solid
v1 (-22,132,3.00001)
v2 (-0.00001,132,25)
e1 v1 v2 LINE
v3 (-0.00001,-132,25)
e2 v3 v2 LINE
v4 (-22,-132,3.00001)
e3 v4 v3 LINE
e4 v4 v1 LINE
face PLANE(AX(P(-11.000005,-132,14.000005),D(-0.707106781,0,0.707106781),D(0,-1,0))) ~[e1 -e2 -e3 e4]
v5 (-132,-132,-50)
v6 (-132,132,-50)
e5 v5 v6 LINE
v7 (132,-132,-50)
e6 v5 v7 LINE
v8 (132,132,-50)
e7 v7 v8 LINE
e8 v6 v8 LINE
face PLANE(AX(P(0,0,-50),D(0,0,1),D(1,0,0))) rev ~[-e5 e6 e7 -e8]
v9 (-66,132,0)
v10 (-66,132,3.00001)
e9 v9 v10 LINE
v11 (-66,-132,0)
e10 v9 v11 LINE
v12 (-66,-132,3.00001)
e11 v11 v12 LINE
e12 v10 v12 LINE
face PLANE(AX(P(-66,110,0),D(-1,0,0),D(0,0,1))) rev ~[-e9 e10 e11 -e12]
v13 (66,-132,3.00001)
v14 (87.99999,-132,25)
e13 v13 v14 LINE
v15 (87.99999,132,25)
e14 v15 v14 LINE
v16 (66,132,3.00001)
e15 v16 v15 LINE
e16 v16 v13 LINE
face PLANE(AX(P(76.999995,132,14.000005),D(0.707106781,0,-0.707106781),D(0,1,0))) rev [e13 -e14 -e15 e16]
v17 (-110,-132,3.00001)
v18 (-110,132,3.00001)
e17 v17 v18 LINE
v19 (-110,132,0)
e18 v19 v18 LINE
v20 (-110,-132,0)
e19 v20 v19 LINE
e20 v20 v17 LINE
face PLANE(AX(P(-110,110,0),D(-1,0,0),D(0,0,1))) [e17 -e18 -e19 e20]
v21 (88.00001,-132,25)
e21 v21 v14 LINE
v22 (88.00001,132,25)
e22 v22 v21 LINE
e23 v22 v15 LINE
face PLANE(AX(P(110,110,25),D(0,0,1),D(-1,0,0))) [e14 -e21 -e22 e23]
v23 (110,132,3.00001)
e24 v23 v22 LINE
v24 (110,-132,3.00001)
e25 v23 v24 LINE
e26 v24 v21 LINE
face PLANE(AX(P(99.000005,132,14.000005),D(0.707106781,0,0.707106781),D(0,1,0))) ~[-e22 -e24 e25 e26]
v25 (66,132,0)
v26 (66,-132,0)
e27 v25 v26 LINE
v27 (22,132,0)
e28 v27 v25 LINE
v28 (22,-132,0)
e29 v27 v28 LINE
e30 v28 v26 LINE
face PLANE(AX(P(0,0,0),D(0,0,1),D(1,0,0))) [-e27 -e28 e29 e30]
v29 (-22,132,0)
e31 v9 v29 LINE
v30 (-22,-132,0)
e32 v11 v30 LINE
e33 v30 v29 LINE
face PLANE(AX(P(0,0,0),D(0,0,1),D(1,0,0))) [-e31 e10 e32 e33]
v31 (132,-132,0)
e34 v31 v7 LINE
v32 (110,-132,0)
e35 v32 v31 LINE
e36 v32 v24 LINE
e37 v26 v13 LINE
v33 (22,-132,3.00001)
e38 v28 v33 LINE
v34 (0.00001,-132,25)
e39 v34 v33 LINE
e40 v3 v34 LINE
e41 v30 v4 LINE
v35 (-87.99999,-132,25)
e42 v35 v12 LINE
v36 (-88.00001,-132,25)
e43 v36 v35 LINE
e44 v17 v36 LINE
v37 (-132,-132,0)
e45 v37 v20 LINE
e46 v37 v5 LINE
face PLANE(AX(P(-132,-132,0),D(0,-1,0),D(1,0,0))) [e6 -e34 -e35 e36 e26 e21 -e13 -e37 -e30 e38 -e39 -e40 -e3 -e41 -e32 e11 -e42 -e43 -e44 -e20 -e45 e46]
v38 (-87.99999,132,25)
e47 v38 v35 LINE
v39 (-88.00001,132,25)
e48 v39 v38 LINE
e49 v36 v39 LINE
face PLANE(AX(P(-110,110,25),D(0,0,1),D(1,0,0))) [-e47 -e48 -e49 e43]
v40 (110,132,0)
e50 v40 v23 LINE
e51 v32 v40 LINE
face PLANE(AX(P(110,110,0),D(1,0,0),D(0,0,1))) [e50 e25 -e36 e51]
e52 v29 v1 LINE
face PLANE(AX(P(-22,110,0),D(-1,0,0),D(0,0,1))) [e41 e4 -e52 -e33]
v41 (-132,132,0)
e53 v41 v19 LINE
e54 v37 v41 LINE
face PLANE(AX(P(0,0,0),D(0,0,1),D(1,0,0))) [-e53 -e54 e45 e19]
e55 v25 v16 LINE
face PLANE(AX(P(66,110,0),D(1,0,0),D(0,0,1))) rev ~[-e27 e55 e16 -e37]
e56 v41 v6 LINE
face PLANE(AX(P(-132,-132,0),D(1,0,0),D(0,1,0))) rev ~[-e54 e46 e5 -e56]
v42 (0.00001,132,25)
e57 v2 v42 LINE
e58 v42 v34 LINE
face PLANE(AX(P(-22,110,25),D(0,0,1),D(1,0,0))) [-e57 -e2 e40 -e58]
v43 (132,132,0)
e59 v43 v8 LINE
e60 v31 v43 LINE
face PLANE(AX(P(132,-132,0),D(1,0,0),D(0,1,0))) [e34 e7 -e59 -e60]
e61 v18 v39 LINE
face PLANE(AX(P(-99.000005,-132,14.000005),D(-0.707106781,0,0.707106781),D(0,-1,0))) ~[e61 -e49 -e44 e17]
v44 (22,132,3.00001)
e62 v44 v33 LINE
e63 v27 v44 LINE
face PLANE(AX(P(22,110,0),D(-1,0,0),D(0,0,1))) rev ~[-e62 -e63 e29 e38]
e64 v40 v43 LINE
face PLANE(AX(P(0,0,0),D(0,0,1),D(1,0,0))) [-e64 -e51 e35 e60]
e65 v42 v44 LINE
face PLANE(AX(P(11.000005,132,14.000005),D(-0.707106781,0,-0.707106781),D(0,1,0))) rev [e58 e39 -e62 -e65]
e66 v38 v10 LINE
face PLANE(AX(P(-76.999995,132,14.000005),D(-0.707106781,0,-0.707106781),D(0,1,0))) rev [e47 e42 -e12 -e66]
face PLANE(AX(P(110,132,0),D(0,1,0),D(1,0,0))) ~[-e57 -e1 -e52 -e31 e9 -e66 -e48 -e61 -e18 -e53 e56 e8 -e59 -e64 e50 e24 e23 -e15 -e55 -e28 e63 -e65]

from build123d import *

# Parameters (mm, degrees)
F0_W     = 44
F0_H     = 44
F1_DEPTH = 25
F0_W_2   = 264
F0_H_2   = 264
F4_DEPTH = 50
F5_DEPTH = 44
F6_DEPTH = 22
F7_SIZE  = 21.99999


# Not quite as in the source:
# - a fillet or chamfer is up to 0.001 mm smaller than in the source, because OpenCascade refuses the exact size


with BuildPart() as f1:
    # F0 (on Top) → F1 (new body)
    with BuildSketch(Plane.XY):
        with Locations((-88, 88)):
            Rectangle(F0_W, F0_H)
    extrude(amount=F1_DEPTH)


with BuildPart() as f1b:
    # F0 (on Top) → F1, piece 2 (new body)
    with BuildSketch(Plane.XY):
        with Locations((0, 88)):
            Rectangle(F0_W, F0_H)
    extrude(amount=F1_DEPTH)


with BuildPart() as f1c:
    # F0 (on Top) → F1, piece 3 (new body)
    with BuildSketch(Plane.XY):
        Rectangle(F0_W, F0_H)
    extrude(amount=F1_DEPTH)


with BuildPart() as f1d:
    # F0 (on Top) → F1, piece 4 (new body)
    with BuildSketch(Plane.XY):
        with Locations((-88, 0)):
            Rectangle(F0_W, F0_H)
    extrude(amount=F1_DEPTH)


with BuildPart() as f2_1:
    # F2: instance of F1d
    add(f1d.part.mirror(Plane.YZ))


with BuildPart() as f2_2:
    # F2: instance of F1
    add(f1.part.mirror(Plane.YZ))


with BuildPart() as f3_1:
    # F3: instance of F1
    add(f1.part.mirror(Plane.XZ))


with BuildPart() as f3_2:
    # F3: instance of F1b
    add(f1b.part.mirror(Plane.XZ))


with BuildPart() as f3_3:
    # F3: instance of F2_2
    add(f2_2.part.mirror(Plane.XZ))


with BuildPart() as f1_1:
    add(f1.part)

    add(f1b.part)  # F4 merges F1b

    add(f1c.part)  # F4 merges F1c

    add(f1d.part)  # F4 merges F1d

    add(f2_1.part)  # F4 merges F2_1

    add(f2_2.part)  # F4 merges F2_2

    add(f3_1.part)  # F4 merges F3_1

    add(f3_2.part)  # F4 merges F3_2

    add(f3_3.part)  # F4 merges F3_3
    # F0 (on Top) → F4 (join)
    with BuildSketch(Plane.XY):
        Rectangle(F0_W_2, F0_H_2)
        with Locations((-88, 0)):
            Rectangle(F0_W, F0_H, mode=Mode.SUBTRACT)
        with Locations((-88, 88)):
            Rectangle(F0_W, F0_H, mode=Mode.SUBTRACT)
        Rectangle(F0_W, F0_H, mode=Mode.SUBTRACT)
        with Locations((0, 88)):
            Rectangle(F0_W, F0_H, mode=Mode.SUBTRACT)
        with Locations((-88, 0)):
            Rectangle(F0_W, F0_H)
        Rectangle(F0_W, F0_H)
        with Locations((-88, 88)):
            Rectangle(F0_W, F0_H)
        with Locations((0, 88)):
            Rectangle(F0_W, F0_H)
    extrude(amount=-F4_DEPTH)

    # F5 (add): faces of the model
    f5_faces = [f1_1.faces().sort_by_distance(p)[0] for p in [
        (-88, -66, 12.5),
        (-88, 22, 12.5),
        (0, 22, 12.5),
        (0, -66, 12.5),
        (88, -66, 12.5),
        (88, 22, 12.5),
    ]]
    extrude(f5_faces, amount=F5_DEPTH)

    # F6 (add, symmetric): faces of the model
    f6_faces = [f1_1.faces().sort_by_distance(p)[0] for p in [
        (-88, -110, 12.5),
        (0, -110, 12.5),
        (88, -110, 12.5),
        (-88, 110, 12.5),
        (0, 110, 12.5),
        (88, 110, 12.5),
    ]]
    extrude(f6_faces, amount=F6_DEPTH, both=True, dir=(0, -1, 0))

    # F7 (size 22 in the source; OpenCascade refuses exactly that, so slightly less here)
    f7_edges = [f1_1.edges().sort_by_distance(p)[0] for p in [
        (-110, 0, 25),
        (-66, 0, 25),
        (-22, 0, 25),
        (22, 0, 25),
        (110, 0, 25),
        (66, 0, 25),
    ]]
    chamfer(f7_edges, length=F7_SIZE)


solid = f1_1.part
